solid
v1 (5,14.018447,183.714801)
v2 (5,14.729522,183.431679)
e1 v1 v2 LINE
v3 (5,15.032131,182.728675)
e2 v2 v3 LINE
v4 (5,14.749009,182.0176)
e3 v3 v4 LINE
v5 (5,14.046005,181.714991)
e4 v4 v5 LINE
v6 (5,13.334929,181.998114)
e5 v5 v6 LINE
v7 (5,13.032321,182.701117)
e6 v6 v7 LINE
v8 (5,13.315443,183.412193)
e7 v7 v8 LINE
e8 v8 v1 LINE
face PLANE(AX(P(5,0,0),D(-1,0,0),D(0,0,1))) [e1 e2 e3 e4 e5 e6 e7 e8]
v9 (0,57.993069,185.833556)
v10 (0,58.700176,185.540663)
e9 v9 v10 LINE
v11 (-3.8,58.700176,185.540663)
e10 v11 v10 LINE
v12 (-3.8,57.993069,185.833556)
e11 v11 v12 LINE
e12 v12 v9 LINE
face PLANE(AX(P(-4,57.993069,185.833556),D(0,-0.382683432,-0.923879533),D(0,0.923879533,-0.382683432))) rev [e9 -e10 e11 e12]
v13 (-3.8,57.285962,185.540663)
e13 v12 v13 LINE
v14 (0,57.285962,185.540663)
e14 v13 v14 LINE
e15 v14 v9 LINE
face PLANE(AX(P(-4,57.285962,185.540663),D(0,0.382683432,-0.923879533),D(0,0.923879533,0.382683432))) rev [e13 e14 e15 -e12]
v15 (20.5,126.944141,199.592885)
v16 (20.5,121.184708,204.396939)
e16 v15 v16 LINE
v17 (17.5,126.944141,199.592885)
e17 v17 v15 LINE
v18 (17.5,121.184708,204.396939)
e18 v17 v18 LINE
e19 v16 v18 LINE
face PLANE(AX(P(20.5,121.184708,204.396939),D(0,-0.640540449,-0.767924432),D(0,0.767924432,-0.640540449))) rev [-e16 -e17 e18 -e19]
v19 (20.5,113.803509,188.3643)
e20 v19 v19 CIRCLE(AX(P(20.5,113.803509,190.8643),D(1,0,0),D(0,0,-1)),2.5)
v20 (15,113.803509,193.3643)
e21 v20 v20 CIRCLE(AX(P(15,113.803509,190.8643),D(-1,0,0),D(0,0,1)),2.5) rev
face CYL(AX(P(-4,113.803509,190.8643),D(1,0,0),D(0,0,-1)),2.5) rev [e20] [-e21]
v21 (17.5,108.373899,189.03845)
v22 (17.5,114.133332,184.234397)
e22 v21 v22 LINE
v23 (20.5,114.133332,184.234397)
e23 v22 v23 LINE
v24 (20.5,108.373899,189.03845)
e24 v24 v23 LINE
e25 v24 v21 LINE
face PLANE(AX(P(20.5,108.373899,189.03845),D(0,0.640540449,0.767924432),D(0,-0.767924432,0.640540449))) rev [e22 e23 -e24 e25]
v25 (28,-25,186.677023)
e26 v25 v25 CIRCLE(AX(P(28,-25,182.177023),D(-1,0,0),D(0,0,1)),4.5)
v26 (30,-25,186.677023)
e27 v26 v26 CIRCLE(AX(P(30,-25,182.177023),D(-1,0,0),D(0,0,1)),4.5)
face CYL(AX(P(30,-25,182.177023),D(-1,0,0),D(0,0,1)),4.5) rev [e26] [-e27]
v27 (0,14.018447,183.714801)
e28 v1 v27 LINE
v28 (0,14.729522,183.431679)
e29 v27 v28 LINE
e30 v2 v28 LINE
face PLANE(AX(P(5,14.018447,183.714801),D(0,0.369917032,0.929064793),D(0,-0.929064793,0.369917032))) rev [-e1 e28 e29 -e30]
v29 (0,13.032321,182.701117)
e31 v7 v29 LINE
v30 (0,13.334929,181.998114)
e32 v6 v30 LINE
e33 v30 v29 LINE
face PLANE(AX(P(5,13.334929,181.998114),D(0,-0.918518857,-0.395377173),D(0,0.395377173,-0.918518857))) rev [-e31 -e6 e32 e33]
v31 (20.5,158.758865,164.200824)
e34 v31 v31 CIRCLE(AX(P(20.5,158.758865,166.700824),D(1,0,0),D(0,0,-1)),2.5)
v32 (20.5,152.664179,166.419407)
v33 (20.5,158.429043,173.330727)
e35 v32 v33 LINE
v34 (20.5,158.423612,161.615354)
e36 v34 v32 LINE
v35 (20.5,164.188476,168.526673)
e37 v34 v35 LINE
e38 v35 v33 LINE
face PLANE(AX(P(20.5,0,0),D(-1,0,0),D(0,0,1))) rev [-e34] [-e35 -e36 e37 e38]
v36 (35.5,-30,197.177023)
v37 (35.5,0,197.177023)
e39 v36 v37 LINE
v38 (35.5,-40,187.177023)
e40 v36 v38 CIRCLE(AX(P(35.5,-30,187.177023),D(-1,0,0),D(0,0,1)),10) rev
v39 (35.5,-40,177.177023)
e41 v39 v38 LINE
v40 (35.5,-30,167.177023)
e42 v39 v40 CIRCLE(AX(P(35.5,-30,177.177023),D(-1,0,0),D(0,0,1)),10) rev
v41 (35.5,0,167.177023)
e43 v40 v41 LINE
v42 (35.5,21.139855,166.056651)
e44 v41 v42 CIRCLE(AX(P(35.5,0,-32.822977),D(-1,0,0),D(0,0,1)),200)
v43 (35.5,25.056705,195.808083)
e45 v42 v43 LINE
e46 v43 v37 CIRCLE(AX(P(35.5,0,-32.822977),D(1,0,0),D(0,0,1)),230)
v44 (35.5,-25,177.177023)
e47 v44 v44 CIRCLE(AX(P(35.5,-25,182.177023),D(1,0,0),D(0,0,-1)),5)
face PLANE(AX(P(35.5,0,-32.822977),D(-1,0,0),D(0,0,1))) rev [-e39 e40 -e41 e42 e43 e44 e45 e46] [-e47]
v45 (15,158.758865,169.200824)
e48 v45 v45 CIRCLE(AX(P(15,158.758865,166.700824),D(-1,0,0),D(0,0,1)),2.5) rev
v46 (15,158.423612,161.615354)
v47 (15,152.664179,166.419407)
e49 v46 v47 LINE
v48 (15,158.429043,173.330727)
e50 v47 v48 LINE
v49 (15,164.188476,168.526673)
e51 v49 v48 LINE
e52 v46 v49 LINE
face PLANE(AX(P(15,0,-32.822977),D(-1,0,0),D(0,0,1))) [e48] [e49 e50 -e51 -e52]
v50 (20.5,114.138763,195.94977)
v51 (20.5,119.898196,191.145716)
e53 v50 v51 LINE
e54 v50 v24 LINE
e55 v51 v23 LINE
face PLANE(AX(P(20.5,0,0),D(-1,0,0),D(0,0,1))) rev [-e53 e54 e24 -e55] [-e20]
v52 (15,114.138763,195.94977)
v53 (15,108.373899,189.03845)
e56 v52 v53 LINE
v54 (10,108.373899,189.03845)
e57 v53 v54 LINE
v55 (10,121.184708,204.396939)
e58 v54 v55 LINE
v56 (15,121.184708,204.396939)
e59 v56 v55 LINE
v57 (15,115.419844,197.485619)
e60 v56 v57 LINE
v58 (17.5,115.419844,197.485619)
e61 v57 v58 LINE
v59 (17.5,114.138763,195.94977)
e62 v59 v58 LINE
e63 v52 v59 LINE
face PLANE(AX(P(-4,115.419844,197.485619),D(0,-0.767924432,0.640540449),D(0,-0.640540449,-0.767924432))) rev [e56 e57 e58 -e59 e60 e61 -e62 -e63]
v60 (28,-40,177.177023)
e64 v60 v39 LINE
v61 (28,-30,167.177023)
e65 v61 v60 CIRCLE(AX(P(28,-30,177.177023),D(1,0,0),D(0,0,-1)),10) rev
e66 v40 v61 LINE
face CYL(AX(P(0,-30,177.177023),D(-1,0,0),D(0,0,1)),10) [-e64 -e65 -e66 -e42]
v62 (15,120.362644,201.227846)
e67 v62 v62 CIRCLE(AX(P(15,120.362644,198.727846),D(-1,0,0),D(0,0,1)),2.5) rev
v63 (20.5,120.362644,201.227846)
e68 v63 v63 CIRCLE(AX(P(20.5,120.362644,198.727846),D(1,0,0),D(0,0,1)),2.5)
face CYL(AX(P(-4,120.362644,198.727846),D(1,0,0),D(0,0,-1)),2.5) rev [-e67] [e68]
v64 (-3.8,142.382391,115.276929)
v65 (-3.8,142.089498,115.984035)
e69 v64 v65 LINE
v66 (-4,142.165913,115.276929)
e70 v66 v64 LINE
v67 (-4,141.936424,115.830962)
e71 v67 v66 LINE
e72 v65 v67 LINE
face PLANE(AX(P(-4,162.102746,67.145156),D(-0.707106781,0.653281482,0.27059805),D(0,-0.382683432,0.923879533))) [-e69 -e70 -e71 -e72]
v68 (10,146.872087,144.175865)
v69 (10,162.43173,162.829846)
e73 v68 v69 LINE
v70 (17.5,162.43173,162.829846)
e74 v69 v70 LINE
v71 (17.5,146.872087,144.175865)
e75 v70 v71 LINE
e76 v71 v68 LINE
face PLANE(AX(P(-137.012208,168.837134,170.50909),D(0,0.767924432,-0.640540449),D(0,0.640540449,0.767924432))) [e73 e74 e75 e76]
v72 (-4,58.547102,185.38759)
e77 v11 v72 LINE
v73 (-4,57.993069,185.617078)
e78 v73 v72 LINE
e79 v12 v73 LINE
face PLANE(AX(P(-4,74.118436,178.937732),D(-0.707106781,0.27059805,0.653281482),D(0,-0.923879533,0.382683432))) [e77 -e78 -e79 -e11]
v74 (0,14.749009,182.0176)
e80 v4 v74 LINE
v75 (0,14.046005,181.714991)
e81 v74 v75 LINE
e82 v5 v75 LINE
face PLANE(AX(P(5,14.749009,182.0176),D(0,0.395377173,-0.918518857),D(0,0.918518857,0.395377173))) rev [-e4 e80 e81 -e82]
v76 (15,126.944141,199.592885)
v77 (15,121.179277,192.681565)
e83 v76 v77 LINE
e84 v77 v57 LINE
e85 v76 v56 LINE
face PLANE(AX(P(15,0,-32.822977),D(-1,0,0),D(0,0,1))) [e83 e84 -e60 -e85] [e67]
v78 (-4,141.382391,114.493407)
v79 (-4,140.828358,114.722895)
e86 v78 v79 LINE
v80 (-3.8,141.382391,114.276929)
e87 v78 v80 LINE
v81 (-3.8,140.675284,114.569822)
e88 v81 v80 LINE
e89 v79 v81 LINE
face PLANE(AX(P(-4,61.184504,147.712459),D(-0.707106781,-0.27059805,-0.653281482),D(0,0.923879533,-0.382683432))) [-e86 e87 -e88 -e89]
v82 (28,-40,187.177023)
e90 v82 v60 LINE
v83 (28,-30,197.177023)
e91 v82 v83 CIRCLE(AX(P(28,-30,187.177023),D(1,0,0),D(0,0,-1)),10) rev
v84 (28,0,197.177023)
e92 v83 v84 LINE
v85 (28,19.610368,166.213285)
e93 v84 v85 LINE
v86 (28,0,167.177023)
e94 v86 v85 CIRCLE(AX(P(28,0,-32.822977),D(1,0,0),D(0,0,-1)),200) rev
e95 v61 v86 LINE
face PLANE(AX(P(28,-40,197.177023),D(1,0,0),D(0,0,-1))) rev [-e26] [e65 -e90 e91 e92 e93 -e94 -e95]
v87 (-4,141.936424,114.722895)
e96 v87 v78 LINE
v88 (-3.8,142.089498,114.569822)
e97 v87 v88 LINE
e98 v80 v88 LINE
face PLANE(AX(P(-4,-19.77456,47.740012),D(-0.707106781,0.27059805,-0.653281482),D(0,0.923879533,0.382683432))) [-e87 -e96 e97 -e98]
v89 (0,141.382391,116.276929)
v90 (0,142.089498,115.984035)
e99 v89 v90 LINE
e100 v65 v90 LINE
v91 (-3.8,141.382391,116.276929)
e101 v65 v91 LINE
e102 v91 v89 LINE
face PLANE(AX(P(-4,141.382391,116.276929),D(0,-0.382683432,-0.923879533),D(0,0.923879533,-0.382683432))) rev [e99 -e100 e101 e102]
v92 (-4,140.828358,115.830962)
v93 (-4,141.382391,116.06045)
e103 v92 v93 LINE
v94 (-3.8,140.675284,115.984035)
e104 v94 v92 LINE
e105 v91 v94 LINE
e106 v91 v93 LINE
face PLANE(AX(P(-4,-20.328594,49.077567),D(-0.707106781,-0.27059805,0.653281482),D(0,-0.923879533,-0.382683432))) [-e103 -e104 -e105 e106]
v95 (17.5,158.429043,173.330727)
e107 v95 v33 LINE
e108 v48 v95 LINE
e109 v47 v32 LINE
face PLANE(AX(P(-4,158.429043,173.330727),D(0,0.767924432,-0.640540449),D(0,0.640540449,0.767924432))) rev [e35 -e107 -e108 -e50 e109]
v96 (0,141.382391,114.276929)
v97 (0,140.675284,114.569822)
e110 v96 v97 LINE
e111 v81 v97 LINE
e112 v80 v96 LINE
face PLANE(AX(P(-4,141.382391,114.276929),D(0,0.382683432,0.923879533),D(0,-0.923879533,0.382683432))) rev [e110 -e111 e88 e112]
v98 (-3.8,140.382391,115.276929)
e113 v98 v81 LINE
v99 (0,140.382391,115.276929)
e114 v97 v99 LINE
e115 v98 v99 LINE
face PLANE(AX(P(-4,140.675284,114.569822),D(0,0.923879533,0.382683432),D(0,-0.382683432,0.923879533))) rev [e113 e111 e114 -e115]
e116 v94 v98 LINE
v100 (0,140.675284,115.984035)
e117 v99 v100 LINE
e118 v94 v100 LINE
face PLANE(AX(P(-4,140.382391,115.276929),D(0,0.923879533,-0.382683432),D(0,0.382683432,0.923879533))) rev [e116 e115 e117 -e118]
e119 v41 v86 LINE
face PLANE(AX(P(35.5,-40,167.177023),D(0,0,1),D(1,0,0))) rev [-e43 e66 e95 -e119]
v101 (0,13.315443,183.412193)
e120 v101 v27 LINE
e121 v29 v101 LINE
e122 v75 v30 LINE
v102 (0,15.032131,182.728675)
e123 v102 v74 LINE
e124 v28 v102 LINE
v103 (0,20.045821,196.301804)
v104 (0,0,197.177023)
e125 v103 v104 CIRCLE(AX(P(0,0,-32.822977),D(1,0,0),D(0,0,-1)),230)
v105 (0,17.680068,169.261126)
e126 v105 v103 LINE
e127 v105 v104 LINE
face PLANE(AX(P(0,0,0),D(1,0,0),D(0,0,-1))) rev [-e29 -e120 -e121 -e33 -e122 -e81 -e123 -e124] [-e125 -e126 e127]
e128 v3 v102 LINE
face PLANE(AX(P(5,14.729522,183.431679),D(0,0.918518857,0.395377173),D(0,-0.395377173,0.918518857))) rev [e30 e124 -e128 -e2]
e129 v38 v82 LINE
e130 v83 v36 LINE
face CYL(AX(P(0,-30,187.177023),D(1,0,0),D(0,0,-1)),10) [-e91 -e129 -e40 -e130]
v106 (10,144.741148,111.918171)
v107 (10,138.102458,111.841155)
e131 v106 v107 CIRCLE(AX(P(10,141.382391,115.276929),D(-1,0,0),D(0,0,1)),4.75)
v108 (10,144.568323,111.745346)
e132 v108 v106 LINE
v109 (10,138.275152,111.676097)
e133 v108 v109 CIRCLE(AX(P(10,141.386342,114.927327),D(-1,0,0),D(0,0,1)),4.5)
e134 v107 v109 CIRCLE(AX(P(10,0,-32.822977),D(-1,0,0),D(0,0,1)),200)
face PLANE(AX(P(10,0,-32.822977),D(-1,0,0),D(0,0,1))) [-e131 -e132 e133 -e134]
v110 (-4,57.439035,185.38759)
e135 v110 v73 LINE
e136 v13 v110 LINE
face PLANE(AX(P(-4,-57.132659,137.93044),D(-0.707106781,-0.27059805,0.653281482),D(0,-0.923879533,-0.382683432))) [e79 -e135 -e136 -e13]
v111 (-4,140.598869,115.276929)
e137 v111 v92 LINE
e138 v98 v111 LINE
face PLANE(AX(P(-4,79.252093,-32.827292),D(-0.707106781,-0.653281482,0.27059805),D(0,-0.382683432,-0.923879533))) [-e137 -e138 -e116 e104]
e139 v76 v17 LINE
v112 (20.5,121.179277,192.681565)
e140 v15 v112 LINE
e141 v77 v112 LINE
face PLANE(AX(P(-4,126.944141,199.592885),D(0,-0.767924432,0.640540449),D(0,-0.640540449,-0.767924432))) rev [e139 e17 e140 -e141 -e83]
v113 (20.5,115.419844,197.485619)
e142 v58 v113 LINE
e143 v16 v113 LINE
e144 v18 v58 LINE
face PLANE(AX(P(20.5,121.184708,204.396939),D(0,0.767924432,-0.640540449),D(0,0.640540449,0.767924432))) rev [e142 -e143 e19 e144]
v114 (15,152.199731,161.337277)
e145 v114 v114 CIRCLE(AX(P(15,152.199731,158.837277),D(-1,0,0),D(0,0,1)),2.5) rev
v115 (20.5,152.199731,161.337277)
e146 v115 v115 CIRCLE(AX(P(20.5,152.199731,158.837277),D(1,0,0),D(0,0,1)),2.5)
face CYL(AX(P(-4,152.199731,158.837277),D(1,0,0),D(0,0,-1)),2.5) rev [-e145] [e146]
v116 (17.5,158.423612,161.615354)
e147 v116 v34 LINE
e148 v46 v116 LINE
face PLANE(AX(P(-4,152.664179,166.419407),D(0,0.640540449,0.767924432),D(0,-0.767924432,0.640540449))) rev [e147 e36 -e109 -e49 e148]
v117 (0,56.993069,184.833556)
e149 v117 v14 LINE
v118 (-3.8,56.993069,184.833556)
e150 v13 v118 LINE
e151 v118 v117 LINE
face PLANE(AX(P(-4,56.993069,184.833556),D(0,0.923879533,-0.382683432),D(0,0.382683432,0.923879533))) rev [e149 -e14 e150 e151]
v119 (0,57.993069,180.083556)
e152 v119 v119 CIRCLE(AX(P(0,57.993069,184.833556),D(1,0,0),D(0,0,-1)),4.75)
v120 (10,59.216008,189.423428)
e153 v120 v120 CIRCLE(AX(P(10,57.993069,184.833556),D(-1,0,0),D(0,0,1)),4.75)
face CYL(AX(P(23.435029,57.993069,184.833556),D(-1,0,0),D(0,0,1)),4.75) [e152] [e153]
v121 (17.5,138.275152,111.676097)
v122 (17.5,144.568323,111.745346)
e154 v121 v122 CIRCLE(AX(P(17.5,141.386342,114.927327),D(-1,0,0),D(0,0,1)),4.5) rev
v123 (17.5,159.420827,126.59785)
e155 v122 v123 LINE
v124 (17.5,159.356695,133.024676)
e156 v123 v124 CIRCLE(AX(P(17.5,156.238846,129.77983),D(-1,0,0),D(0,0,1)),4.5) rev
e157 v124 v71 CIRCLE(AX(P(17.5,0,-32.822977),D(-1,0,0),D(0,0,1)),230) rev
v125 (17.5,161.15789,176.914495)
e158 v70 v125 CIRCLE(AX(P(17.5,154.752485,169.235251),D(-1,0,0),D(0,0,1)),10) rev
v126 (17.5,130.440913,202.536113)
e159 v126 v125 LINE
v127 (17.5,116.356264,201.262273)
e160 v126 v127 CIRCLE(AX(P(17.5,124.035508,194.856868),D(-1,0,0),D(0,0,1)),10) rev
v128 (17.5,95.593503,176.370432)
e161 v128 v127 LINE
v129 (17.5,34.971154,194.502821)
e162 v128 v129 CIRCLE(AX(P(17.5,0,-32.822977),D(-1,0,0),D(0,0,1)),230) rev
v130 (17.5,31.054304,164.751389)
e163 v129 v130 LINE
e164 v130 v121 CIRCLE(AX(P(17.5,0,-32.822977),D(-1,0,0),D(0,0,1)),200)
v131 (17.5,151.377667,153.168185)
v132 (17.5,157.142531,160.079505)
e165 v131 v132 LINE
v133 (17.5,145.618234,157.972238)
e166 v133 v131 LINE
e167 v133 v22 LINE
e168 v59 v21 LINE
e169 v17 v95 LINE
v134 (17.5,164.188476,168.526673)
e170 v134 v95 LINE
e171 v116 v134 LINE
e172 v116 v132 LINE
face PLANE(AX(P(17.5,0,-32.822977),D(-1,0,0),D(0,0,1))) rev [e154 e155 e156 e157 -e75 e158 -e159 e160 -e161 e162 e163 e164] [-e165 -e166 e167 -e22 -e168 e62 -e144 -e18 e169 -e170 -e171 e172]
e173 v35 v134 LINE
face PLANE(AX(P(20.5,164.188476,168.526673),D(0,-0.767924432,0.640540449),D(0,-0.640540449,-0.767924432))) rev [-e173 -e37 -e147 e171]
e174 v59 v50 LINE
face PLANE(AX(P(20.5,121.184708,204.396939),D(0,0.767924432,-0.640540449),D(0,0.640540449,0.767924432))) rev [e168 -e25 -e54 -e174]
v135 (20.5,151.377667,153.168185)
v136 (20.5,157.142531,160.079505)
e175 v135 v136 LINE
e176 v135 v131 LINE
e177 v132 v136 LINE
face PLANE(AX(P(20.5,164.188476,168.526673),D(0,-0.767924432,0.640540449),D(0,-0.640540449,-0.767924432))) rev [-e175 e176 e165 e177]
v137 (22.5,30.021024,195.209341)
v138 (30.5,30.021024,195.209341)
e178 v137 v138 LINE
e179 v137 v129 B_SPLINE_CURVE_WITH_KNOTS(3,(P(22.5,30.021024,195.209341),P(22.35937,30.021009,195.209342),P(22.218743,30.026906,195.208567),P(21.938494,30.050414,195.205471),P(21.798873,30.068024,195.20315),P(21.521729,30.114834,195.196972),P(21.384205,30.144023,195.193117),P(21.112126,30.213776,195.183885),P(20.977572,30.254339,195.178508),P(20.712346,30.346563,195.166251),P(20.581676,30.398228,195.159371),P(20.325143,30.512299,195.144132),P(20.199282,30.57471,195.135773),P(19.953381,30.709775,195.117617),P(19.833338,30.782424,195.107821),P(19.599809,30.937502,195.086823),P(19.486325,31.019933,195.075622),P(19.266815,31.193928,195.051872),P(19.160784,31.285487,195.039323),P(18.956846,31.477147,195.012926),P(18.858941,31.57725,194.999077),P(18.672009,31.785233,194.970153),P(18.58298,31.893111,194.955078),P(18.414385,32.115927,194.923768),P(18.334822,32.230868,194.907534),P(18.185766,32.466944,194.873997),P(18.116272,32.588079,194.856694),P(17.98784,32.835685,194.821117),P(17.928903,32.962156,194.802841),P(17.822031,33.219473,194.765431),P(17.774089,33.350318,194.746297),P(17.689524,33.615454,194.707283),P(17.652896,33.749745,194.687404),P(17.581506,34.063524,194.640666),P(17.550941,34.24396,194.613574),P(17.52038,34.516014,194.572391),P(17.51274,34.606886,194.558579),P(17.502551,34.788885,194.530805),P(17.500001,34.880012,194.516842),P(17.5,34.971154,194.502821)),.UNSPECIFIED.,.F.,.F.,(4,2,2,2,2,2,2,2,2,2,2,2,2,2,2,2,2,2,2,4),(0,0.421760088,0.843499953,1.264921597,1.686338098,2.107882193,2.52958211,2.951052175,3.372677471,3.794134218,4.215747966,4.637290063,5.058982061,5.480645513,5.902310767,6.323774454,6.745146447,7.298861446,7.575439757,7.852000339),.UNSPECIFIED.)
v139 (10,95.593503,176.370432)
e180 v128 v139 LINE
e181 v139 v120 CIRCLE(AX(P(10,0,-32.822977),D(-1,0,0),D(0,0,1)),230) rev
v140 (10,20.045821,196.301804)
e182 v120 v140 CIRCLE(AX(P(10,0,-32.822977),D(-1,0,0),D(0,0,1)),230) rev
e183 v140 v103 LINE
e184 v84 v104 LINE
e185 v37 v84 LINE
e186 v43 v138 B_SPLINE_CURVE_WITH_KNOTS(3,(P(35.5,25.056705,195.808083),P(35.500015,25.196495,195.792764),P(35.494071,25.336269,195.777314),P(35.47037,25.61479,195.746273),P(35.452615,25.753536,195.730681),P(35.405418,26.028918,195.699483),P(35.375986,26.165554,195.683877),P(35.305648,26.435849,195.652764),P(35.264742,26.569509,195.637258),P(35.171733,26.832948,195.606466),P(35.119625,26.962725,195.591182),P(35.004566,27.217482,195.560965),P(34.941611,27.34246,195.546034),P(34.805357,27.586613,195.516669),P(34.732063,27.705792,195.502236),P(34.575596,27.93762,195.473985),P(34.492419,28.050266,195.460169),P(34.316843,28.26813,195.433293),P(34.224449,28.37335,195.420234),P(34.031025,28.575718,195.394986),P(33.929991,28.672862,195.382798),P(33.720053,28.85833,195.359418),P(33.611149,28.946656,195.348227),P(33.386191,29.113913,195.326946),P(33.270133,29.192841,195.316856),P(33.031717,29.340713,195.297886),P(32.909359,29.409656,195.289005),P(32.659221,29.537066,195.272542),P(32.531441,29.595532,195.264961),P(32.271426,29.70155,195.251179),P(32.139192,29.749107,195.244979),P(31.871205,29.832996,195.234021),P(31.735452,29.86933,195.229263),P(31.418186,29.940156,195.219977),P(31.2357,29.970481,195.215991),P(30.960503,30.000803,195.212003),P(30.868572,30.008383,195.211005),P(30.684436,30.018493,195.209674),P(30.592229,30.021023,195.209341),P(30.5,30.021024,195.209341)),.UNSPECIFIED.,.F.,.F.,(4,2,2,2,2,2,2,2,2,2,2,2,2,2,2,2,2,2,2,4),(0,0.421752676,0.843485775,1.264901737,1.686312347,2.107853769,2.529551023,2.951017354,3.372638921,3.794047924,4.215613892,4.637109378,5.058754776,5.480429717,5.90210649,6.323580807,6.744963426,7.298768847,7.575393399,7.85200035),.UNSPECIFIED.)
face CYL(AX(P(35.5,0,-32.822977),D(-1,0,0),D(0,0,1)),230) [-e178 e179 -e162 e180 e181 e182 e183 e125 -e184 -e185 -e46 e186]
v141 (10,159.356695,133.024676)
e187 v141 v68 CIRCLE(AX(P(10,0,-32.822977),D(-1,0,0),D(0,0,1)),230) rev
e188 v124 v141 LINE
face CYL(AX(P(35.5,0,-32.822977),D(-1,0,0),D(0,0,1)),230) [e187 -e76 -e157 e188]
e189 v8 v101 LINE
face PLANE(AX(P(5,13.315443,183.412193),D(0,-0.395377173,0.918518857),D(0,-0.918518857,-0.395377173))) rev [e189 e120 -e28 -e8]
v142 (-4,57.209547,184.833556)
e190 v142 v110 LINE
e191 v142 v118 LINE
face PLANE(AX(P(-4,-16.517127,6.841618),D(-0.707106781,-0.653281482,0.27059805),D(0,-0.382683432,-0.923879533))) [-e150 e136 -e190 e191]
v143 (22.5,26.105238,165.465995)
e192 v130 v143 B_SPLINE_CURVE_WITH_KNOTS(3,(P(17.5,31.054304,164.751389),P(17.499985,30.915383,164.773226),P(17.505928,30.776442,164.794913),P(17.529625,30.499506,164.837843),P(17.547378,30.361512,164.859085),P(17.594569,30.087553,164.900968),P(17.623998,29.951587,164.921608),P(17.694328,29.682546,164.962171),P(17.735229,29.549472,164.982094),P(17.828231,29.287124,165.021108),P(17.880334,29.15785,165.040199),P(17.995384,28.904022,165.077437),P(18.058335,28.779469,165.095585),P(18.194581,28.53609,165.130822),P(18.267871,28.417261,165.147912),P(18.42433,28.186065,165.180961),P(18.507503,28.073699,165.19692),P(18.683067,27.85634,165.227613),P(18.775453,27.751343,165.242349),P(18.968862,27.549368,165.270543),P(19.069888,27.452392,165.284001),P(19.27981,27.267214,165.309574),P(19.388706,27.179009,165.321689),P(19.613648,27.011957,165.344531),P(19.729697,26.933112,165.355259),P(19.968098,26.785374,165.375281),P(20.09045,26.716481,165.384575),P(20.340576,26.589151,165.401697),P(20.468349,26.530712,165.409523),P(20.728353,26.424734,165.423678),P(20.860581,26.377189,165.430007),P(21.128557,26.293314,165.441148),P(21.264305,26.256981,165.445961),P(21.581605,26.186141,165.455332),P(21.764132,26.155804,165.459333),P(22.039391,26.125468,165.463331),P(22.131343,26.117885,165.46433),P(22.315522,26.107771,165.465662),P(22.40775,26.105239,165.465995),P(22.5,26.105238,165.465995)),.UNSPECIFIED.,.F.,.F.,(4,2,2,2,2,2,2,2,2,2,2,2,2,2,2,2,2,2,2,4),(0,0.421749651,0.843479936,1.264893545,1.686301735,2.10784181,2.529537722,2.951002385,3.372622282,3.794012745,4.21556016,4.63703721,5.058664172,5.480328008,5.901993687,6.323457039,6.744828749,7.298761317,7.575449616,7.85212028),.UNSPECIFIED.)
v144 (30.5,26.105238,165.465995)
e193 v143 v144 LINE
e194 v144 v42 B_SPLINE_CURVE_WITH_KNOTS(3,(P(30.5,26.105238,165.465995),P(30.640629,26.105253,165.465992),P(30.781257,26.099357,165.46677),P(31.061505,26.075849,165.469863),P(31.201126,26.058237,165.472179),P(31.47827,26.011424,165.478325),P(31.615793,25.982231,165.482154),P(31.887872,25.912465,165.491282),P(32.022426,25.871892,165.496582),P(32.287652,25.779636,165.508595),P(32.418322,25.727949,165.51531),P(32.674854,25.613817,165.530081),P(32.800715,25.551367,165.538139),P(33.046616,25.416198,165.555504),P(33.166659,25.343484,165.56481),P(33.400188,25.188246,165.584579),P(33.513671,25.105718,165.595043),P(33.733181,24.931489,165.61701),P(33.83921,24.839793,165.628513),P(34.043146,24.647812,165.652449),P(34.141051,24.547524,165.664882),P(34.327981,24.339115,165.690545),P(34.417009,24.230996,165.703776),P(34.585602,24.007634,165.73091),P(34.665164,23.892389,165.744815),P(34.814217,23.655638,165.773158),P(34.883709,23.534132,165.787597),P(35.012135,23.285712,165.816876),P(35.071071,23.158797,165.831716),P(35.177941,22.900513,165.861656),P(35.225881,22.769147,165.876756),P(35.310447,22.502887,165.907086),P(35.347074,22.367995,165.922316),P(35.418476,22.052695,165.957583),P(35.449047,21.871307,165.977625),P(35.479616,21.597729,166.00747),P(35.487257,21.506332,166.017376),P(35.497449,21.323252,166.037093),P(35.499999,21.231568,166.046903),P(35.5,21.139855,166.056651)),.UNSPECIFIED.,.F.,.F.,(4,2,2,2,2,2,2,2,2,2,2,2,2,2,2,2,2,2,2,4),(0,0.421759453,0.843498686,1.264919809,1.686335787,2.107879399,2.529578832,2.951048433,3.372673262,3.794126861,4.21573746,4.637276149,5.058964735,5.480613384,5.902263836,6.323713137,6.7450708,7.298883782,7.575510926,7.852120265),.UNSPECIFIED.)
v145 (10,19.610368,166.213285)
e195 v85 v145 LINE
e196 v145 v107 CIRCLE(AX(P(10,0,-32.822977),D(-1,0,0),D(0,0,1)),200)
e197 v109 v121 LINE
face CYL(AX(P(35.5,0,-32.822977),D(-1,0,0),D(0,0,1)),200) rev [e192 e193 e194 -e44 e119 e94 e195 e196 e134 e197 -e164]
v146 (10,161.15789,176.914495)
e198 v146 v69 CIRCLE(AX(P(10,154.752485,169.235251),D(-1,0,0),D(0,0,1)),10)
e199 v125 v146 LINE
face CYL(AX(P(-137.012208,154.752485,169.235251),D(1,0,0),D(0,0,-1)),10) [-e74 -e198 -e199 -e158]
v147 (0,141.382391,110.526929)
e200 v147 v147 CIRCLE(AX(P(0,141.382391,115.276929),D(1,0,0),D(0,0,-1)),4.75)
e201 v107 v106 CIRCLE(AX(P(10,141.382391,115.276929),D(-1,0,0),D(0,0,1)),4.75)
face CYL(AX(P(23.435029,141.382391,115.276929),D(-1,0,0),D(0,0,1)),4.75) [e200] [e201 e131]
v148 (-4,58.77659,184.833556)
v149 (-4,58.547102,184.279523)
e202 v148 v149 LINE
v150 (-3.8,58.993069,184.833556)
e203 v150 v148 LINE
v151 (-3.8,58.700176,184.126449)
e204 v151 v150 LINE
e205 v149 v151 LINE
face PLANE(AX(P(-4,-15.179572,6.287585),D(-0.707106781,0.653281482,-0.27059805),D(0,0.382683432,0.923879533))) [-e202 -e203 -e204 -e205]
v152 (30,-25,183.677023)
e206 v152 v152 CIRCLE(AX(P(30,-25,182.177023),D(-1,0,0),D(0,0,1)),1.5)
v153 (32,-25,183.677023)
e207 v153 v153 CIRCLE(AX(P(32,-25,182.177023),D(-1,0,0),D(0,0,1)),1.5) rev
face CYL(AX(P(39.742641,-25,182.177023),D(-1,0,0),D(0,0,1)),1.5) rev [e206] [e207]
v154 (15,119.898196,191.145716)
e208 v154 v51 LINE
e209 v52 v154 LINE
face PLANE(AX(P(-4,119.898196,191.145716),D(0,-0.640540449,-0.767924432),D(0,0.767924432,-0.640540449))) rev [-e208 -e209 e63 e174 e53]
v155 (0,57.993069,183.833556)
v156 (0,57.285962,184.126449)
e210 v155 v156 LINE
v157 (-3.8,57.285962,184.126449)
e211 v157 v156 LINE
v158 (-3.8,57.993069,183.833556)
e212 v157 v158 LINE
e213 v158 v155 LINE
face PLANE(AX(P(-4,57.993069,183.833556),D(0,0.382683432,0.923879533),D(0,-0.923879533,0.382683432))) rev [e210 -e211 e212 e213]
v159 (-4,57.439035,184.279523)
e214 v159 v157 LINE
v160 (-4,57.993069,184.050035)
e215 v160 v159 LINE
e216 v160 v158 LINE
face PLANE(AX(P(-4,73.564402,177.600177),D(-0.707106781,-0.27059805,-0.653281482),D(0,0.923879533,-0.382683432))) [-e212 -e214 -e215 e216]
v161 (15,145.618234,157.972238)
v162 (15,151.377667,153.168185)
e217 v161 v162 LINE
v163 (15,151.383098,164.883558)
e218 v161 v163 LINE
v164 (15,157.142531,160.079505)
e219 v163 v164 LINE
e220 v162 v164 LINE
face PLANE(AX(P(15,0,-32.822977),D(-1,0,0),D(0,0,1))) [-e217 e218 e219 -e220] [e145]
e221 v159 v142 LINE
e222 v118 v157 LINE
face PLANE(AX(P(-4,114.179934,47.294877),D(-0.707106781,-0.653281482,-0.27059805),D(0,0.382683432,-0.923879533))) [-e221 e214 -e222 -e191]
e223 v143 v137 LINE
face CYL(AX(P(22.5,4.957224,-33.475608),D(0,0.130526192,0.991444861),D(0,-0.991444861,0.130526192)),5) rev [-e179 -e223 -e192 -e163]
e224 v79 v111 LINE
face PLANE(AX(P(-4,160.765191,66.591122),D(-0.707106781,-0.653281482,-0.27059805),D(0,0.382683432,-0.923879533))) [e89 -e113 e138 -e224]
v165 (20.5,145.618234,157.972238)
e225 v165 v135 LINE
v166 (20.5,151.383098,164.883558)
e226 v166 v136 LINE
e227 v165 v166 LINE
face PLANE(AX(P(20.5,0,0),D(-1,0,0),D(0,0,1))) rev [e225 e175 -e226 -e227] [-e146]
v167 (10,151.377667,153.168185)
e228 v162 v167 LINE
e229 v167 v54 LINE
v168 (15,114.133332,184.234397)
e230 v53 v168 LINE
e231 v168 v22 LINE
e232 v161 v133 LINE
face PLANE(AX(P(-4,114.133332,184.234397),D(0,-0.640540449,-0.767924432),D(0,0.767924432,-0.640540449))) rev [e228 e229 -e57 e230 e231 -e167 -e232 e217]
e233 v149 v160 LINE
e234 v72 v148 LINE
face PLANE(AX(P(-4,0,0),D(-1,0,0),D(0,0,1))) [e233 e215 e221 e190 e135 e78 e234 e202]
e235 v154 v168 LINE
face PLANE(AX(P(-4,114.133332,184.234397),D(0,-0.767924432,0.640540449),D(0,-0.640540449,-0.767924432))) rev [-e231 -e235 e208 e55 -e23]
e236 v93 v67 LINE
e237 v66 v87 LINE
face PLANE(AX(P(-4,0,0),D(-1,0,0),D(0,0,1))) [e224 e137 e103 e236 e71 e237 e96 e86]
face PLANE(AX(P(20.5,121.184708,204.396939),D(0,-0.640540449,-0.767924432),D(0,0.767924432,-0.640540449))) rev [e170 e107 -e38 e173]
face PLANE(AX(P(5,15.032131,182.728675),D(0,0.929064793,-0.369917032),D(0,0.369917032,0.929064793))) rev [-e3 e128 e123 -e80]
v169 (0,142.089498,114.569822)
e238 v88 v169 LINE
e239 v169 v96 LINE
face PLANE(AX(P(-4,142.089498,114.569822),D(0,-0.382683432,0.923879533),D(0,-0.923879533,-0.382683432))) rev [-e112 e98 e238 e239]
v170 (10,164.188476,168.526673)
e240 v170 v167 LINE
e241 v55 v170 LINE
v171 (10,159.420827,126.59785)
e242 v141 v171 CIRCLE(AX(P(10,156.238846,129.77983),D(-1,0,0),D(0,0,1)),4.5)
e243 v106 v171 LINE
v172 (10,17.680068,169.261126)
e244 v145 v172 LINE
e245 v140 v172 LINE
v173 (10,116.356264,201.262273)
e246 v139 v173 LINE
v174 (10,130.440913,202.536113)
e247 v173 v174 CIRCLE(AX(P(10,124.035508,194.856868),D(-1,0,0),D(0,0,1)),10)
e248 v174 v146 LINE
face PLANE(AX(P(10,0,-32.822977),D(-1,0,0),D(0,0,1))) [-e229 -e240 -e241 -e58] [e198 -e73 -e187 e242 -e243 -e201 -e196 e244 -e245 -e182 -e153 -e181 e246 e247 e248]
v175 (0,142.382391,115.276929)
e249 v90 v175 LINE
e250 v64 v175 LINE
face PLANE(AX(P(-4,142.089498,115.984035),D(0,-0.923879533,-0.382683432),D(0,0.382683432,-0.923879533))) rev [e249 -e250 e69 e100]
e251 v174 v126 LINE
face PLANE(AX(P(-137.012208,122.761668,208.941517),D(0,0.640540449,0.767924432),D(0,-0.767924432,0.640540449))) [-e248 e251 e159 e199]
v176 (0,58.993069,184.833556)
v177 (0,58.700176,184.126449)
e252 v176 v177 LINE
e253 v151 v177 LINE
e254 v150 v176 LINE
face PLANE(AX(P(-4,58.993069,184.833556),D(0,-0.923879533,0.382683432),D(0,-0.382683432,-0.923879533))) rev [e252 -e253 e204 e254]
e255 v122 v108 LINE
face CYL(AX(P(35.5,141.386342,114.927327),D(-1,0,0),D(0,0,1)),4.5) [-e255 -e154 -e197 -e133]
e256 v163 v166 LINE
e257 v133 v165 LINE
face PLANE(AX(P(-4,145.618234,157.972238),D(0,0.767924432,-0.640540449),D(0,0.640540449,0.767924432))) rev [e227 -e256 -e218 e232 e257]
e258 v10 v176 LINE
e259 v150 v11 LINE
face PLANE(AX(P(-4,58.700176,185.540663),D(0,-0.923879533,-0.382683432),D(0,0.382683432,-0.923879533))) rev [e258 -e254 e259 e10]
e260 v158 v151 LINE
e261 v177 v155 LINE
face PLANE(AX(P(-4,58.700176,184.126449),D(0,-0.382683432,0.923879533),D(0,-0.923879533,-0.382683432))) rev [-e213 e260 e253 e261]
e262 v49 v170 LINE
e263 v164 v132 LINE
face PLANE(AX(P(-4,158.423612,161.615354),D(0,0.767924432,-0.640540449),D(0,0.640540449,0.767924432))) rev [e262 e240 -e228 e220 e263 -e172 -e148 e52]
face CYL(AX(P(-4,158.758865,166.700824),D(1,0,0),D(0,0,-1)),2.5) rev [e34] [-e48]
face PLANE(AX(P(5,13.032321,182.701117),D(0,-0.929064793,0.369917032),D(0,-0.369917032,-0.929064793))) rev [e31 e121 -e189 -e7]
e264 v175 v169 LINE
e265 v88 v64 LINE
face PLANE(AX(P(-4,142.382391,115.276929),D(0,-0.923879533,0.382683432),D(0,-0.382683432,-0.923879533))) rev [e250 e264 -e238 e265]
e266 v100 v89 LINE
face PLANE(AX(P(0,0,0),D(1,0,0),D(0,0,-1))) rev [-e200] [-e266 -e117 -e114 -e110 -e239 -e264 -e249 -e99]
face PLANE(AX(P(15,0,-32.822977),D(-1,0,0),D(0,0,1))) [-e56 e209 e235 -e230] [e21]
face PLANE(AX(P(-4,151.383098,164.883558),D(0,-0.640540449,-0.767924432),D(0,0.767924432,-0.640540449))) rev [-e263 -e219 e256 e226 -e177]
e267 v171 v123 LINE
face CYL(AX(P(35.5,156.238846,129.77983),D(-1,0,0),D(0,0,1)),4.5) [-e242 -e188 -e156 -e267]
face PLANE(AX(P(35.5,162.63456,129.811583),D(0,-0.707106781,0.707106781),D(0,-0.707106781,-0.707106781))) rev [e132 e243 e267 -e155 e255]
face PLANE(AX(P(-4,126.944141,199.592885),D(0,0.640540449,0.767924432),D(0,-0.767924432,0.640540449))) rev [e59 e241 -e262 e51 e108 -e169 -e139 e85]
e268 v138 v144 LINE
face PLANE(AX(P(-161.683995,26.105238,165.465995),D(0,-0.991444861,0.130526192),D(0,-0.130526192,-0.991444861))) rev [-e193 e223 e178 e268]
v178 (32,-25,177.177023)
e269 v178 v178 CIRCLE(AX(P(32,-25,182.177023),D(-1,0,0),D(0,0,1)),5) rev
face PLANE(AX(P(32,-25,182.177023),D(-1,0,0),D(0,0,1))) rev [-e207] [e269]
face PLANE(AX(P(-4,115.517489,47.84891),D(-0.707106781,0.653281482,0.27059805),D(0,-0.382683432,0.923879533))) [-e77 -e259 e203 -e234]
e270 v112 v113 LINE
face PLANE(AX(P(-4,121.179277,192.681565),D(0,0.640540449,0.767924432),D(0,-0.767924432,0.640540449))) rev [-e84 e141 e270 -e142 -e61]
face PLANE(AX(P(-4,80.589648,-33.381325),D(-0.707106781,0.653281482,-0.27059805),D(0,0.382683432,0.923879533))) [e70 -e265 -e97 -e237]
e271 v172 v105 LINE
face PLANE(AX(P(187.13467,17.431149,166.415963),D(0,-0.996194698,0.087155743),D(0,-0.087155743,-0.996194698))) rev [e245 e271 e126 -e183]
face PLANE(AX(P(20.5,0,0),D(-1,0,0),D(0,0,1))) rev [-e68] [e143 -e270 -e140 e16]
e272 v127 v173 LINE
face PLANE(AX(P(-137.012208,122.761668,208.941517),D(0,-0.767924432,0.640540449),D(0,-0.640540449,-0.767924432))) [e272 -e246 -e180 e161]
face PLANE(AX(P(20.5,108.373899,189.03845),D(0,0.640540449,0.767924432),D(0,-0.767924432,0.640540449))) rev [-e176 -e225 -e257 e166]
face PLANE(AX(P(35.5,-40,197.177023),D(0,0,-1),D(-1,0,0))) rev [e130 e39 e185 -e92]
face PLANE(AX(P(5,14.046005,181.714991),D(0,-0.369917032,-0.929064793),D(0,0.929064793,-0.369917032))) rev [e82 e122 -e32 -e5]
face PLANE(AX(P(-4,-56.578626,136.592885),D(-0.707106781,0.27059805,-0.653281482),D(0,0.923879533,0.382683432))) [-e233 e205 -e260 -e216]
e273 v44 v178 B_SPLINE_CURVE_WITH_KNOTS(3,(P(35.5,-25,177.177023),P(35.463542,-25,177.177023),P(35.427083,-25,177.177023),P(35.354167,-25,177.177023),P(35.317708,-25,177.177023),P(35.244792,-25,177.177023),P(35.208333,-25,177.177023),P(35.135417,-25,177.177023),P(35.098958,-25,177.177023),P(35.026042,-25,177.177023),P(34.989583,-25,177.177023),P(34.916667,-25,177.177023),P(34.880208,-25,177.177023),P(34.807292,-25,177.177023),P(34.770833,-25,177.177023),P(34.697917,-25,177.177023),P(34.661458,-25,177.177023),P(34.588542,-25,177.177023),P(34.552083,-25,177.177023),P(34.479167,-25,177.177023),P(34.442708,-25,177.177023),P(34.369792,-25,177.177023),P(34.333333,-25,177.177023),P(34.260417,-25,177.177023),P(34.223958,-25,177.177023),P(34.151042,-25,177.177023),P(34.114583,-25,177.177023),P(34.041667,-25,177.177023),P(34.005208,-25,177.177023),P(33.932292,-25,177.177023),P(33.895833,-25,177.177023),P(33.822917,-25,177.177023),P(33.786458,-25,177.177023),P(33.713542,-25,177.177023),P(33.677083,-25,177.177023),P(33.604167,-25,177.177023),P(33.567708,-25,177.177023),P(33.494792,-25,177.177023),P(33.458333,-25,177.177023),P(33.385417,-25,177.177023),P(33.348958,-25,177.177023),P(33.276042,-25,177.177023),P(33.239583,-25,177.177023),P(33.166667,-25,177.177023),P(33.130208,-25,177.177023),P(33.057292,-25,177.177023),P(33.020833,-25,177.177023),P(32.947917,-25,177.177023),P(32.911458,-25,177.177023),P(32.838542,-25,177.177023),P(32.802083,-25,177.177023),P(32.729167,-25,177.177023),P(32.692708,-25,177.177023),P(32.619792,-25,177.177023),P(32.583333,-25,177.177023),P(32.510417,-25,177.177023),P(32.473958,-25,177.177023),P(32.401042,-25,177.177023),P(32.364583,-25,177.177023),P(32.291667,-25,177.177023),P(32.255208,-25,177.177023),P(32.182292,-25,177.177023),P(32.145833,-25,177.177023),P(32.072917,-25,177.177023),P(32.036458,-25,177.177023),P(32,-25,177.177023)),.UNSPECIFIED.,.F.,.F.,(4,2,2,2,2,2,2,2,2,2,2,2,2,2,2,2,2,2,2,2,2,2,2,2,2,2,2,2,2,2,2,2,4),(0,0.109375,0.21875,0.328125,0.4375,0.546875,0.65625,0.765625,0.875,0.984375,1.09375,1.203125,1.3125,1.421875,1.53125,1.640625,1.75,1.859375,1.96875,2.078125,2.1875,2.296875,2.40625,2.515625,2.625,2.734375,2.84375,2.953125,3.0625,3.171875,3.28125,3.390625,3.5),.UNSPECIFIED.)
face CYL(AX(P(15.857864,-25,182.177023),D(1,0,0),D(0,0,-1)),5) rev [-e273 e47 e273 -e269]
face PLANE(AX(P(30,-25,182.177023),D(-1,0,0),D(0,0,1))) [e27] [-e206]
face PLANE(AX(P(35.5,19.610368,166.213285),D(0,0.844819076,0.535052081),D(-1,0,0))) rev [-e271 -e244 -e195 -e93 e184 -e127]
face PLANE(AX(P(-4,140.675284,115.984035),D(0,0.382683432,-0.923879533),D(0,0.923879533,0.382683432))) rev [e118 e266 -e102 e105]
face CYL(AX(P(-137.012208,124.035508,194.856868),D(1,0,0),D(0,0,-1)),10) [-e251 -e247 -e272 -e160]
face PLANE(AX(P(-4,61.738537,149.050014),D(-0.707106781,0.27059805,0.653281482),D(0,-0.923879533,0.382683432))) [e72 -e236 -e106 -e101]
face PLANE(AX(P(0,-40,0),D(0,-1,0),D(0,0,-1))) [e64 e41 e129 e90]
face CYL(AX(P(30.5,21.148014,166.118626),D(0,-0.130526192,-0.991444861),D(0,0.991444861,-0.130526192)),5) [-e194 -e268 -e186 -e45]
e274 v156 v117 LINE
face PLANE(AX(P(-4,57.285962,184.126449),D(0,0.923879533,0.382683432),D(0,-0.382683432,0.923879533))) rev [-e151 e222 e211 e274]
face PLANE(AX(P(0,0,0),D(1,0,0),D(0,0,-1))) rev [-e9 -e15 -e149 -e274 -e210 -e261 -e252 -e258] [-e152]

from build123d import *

# Parameters (mm, degrees)
CURVE_MAIN_BODY_DEPTH                = 35.5
CUT_EXTRUDE2_START                   = -18
CUT_EXTRUDE2_DEPTH                   = 18
CUT_EXTRUDE3_DEPTH                   = 10
FILLET3_R                            = 5
FILLET3_OF_MIRROR3_R                 = 5
SKETCH14_W                           = 7.5
SKETCH14_H                           = 30
BOSS_EXTRUDE9_DEPTH                  = 40
SKETCH17_R                           = 4.75
BOSS_EXTRUDE6_DEPTH                  = 20
SERVO_PLACEMENT_BODY_DEPTH           = 7.5
BOSS_EXTRUDE10_DEPTH                 = 27.5
CUT_EXTRUDE8_DEPTH                   = 211.213868042
CUT_EXTRUDE8_DEPTH_BACK              = 211.213868042
SKETCH29_W                           = 20
SKETCH29_H                           = 60
SKETCH21_W                           = 105.177079877
SKETCH21_H                           = 219.768987876
MAKE_HALF_DEPTH                      = 271.966391894
CHAMFER2_SIZE                        = 30
MALE_JACK_DEPTH                      = 4
MALE_JACK_CHAMFER_SIZE               = 0.2
SERVO_PLACEMENT_DEPTH                = 3
SKETCH36_R                           = 2.5
SERVO_HOLE_DEPTH                     = 270.745779446
SERVO_PLACEMENT_COMPLETION_DEPTH     = 5
BICEPS_CONNECTION_FILLET_R           = 10
BOW_CONNECTION_FILLET_R              = 4.5
SERVO_HOLE_FILLET_R                  = 10
SKETCH30_R                           = 4.5
FOREARM_SERVO_CONNECTION_OUTER_DEPTH = 2
SKETCH34_R                           = 1.5
FOREARM_SERVO_CONNECTION_INNER_DEPTH = 5.5
SKETCH38_R                           = 5
CUT_EXTRUDE14_DEPTH                  = 3.5
CUT_EXTRUDE15_DEPTH                  = 5


with BuildPart() as part:
    # Sketch2 → Curve Main Body (new body)
    with BuildSketch(Plane(origin=(0, 0, 0), x_dir=(0, 0, -1), z_dir=(1, 0, 0))):
        with BuildLine():
            Line((-197.17702304, 0), (-167.17702304, 0))
            ThreePointArc((-167.17702304, 0), (-151.952929542, 76.536686473), (-108.598379277, 141.421356237))
            Line((-108.598379277, 141.421356237), (-129.811582713, 162.634559673))
            ThreePointArc((-129.811582713, 162.634559673), (-179.669315518, 88.017189444), (-197.17702304, 0))
        make_face()
    curve_main_body = extrude(amount=CURVE_MAIN_BODY_DEPTH)

    # Sketch6 → Cut-Extrude2 (cut)
    with BuildSketch(Plane(origin=(35.5, 0, 0), x_dir=(0, 0, -1), z_dir=(1, 0, 0)).offset(CUT_EXTRUDE2_START)):
        with BuildLine():
            Line((-165.465995315, 26.105238444), (-195.209341156, 30.021024211))
            ThreePointArc((-195.209341156, 30.021024211), (-173.457753593, 101.72639875), (-129.811582713, 162.634559673))
            Line((-129.811582713, 162.634559673), (-108.598379277, 141.421356237))
            ThreePointArc((-108.598379277, 141.421356237), (-146.551571347, 88.457738044), (-165.465995315, 26.105238444))
        make_face()
    cut_extrude2 = extrude(amount=CUT_EXTRUDE2_DEPTH, mode=Mode.SUBTRACT)

    # Sketch7 → Cut-Extrude3 (cut)
    with BuildSketch(Plane.ZY):
        with BuildLine():
            Line((166.415962658, 17.43114855), (196.301803601, 20.045820832))
            ThreePointArc((196.301803601, 20.045820832), (175.627814058, 97.2022002), (129.811582713, 162.634559673))
            Line((129.811582713, 162.634559673), (108.598379277, 141.421356237))
            ThreePointArc((108.598379277, 141.421356237), (148.438580447, 84.523652348), (166.415962658, 17.43114855))
        make_face()
    cut_extrude3 = extrude(amount=-CUT_EXTRUDE3_DEPTH, mode=Mode.SUBTRACT)

    # Fillet3
    fillet3_edges = [part.edges().sort_by_distance(p)[0] for p in [
        (35.5, 28.063131327, 180.337668235),
        (17.5, 28.063131327, 180.337668235),
    ]]
    fillet(fillet3_edges, radius=FILLET3_R)

    # Mirror3: Curve Main Body, Cut-Extrude2, Cut-Extrude3 across plane
    add(curve_main_body.mirror(Plane(origin=(0, 0, -32.82297696), x_dir=(0, 0, 1), z_dir=(-1, 0, 0))))
    add(cut_extrude2.mirror(Plane(origin=(0, 0, -32.82297696), x_dir=(0, 0, 1), z_dir=(-1, 0, 0))), mode=Mode.SUBTRACT)
    add(cut_extrude3.mirror(Plane(origin=(0, 0, -32.82297696), x_dir=(0, 0, 1), z_dir=(-1, 0, 0))), mode=Mode.SUBTRACT)

    # Fillet3 of Mirror3
    fillet3_of_mirror3_edges = [part.edges().sort_by_distance(p)[0] for p in [
        (-35.5, 28.063131327, 180.337668235),
        (-17.5, 28.063131327, 180.337668235),
    ]]
    fillet(fillet3_of_mirror3_edges, radius=FILLET3_OF_MIRROR3_R)

    # Sketch14 → Boss-Extrude9 (add)
    with BuildSketch(Plane.XZ):
        with Locations((-31.75, 182.17702304)):
            Rectangle(SKETCH14_W, SKETCH14_H)
        with Locations((31.75, 182.17702304)):
            Rectangle(SKETCH14_W, SKETCH14_H)
    extrude(amount=BOSS_EXTRUDE9_DEPTH)

    # Sketch17 → Boss-Extrude6 (add)
    with BuildSketch(Plane(origin=(-10, 0, 0), x_dir=(0, 0, -1), z_dir=(1, 0, 0))):
        with Locations(Location((-115.276928512, 141.382391051, 0), (0, 0, 45))):
            Circle(SKETCH17_R)
        with Locations(Location((-184.833556277, 57.993068891, 0), (0, 0, 165.080977231))):
            Circle(SKETCH17_R)
    extrude(amount=BOSS_EXTRUDE6_DEPTH)

    # Sketch18 → Servo Placement Body (add)
    with BuildSketch(Plane(origin=(-10, 0, 0), x_dir=(0, 0, -1), z_dir=(1, 0, 0))):
        Polygon((-208.94151729, 122.761668275), (-162.866051375, 84.329241332), (-124.433624432, 130.404707247), (-170.509090347, 168.83713419), align=None)
    extrude(amount=-SERVO_PLACEMENT_BODY_DEPTH)

    # Sketch26 → Boss-Extrude10 (add)
    with BuildSketch(Plane(origin=(-10, 0, 0), x_dir=(0, 0, -1), z_dir=(1, 0, 0))):
        Polygon((-144.175864755, 146.872087312), (-170.509090347, 168.83713419), (-208.94151729, 122.761668275), (-176.370431585, 95.593503028), align=None)
    extrude(amount=BOSS_EXTRUDE10_DEPTH)

    # Sketch29 → Cut-Extrude8 (cut, two sides: drawn at the far end of the back side and taken through both)
    with BuildSketch(Plane(origin=(0, 153.143683779, 183.599297347), x_dir=(1, 0, 0), z_dir=(0, 0.640540449048381, 0.767924431915601)).offset(-CUT_EXTRUDE8_DEPTH_BACK)):
        with Locations((0, -9.563808939)):
            Rectangle(SKETCH29_W, SKETCH29_H)
    extrude(amount=CUT_EXTRUDE8_DEPTH + CUT_EXTRUDE8_DEPTH_BACK, mode=Mode.SUBTRACT)

    # Sketch21 → Make Half (cut, through all)
    with BuildSketch(Plane(origin=(0, 0, 0), x_dir=(0, 0, -1), z_dir=(1, 0, 0))):
        with Locations((-156.96960977, 61.310905927)):
            Rectangle(SKETCH21_W, SKETCH21_H)
    extrude(amount=-MAKE_HALF_DEPTH, mode=Mode.SUBTRACT)

    # Chamfer2
    # the kernel refuses this chamfer: 30, 19 mm, written as the material it takes off along each edge
    with BuildSketch(Plane(origin=(-77.551070811, 0, 167.17702304), x_dir=(0, 0, 1), z_dir=(1, 0, 0))) as chamfer2_piece_1:
        with BuildLine():
            Line((CHAMFER2_SIZE, 0), (-0.963738269, -19.610367571))
            ThreePointArc((-0.963738269, -19.610367571), (-0.258402539, -10.163377571), (0, 0))
            Line((0, 0), (CHAMFER2_SIZE, 0))
        make_face()
    extrude(amount=105.551070811, mode=Mode.SUBTRACT)

    # Sketch31 → Male Jack (add)
    with BuildSketch(Plane.ZY):
        Polygon((116.276928512, 141.382391051), (115.984035293, 142.089497832), (115.276928512, 142.382391051), (114.569821731, 142.089497832), (114.276928512, 141.382391051), (114.569821731, 140.675284269), (115.276928512, 140.382391051), (115.984035293, 140.675284269), align=None)
        Polygon((184.833556277, 58.993068891), (184.126449496, 58.700175672), (183.833556277, 57.993068891), (184.126449496, 57.285962109), (184.833556277, 56.993068891), (185.540663058, 57.285962109), (185.833556277, 57.993068891), (185.540663058, 58.700175672), align=None)
    extrude(amount=MALE_JACK_DEPTH)

    # Male Jack Chamfer
    male_jack_chamfer_edges = [part.edges().sort_by_distance(p)[0] for p in [
        (-4, 142.235944441, 115.630481903),
        (-4, 142.235944441, 114.923375121),
        (-4, 141.735944441, 114.423375121),
        (-4, 141.02883766, 114.423375121),
        (-4, 140.52883766, 114.923375121),
        (-4, 140.52883766, 115.630481903),
        (-4, 141.02883766, 116.130481903),
        (-4, 141.735944441, 116.130481903),
        (-4, 58.846622281, 185.187109667),
        (-4, 58.846622281, 184.480002886),
        (-4, 58.346622281, 183.980002886),
        (-4, 57.6395155, 183.980002886),
        (-4, 57.1395155, 184.480002886),
        (-4, 57.1395155, 185.187109667),
        (-4, 57.6395155, 185.687109667),
        (-4, 58.346622281, 185.687109667),
    ]]
    chamfer(male_jack_chamfer_edges, length=MALE_JACK_CHAMFER_SIZE)

    # Sketch35 → Servo Placement (add)
    with BuildSketch(Plane(origin=(17.5, 0, 0), x_dir=(0, 0, -1), z_dir=(1, 0, 0))):
        Polygon((-204.396938583, 121.184707789), (-189.038449945, 108.373898808), (-153.168184798, 151.377666995), (-168.526673437, 164.188475976), align=None)
    extrude(amount=SERVO_PLACEMENT_DEPTH)

    # Sketch36 → Servo Hole (cut, through all)
    with BuildSketch(Plane(origin=(20.5, 0, 0), x_dir=(0, 0, -1), z_dir=(1, 0, 0))):
        with Locations((-166.700823556, 158.758865289)):
            Circle(SKETCH36_R)
        with Locations(Location((-158.837277373, 152.199731091, 0), (0, 0, 180))):
            Circle(SKETCH36_R)
        with Locations((-190.864299826, 113.803509495)):
            Circle(SKETCH36_R)
        with Locations(Location((-198.727846008, 120.362643693, 0), (0, 0, 180))):
            Circle(SKETCH36_R)
        Polygon((-184.234396577, 114.133332047), (-157.972238166, 145.618233756), (-164.883558053, 151.383097797), (-160.079504686, 157.142531036), (-161.615353549, 158.423611935), (-166.419406917, 152.664178695), (-173.330726804, 158.429042737), (-199.592885215, 126.944141028), (-192.681565328, 121.179276987), (-197.485618696, 115.419843747), (-195.949769832, 114.138762849), (-191.145716464, 119.898196089), align=None)
    extrude(amount=-SERVO_HOLE_DEPTH, mode=Mode.SUBTRACT)

    # Sketch37 → Servo Placement Completion (cut)
    with BuildSketch(Plane.ZY.offset(-10)):
        Polygon((153.168184798, 151.377666995), (168.526673437, 164.188475976), (204.396938583, 121.184707789), (189.038449945, 108.373898808), align=None)
    extrude(amount=-SERVO_PLACEMENT_COMPLETION_DEPTH, mode=Mode.SUBTRACT)

    # Biceps Connection Fillet
    biceps_connection_fillet_edges = [part.edges().sort_by_distance(p)[0] for p in [
        (31.75, -40, 197.17702304),
        (31.75, -40, 167.17702304),
    ]]
    fillet(biceps_connection_fillet_edges, radius=BICEPS_CONNECTION_FILLET_R)

    # Bow Connection Fillet
    bow_connection_fillet_edges = [part.edges().sort_by_distance(p)[0] for p in [
        (13.75, 162.634559673, 129.811582713),
        (13.75, 141.421356237, 108.598379277),
    ]]
    fillet(bow_connection_fillet_edges, radius=BOW_CONNECTION_FILLET_R)

    # Servo Hole Fillet
    servo_hole_fillet_edges = [part.edges().sort_by_distance(p)[0] for p in [
        (13.75, 122.761668275, 208.94151729),
        (13.75, 168.83713419, 170.509090347),
    ]]
    fillet(servo_hole_fillet_edges, radius=SERVO_HOLE_FILLET_R)

    # Sketch30 → Forearm Servo Connection Outer (cut)
    with BuildSketch(Plane.ZY.offset(-28)):
        with Locations((182.17702304, -25)):
            Circle(SKETCH30_R)
    extrude(amount=-FOREARM_SERVO_CONNECTION_OUTER_DEPTH, mode=Mode.SUBTRACT)

    # Sketch34 → Forearm Servo Connection Inner (cut)
    with BuildSketch(Plane.ZY.offset(-30)):
        with Locations((182.17702304, -25)):
            Circle(SKETCH34_R)
    extrude(amount=-FOREARM_SERVO_CONNECTION_INNER_DEPTH, mode=Mode.SUBTRACT)

    # Sketch38 → Cut-Extrude14 (cut)
    with BuildSketch(Plane(origin=(35.5, 0, 0), x_dir=(0, 0, -1), z_dir=(1, 0, 0))):
        with Locations((-182.17702304, -25)):
            Circle(SKETCH38_R)
    extrude(amount=-CUT_EXTRUDE14_DEPTH, mode=Mode.SUBTRACT)

    # Sketch39 → Cut-Extrude15 (cut)
    with BuildSketch(Plane.ZY):
        Polygon((183.714801441, 14.018446755), (183.431679202, 14.729522163), (182.728675304, 15.032130751), (182.017599897, 14.749008512), (181.714991309, 14.046004614), (181.998113548, 13.334929206), (182.701117446, 13.032320619), (183.412192854, 13.315442858), align=None)
    extrude(amount=-CUT_EXTRUDE15_DEPTH, mode=Mode.SUBTRACT)


solid = part.part
